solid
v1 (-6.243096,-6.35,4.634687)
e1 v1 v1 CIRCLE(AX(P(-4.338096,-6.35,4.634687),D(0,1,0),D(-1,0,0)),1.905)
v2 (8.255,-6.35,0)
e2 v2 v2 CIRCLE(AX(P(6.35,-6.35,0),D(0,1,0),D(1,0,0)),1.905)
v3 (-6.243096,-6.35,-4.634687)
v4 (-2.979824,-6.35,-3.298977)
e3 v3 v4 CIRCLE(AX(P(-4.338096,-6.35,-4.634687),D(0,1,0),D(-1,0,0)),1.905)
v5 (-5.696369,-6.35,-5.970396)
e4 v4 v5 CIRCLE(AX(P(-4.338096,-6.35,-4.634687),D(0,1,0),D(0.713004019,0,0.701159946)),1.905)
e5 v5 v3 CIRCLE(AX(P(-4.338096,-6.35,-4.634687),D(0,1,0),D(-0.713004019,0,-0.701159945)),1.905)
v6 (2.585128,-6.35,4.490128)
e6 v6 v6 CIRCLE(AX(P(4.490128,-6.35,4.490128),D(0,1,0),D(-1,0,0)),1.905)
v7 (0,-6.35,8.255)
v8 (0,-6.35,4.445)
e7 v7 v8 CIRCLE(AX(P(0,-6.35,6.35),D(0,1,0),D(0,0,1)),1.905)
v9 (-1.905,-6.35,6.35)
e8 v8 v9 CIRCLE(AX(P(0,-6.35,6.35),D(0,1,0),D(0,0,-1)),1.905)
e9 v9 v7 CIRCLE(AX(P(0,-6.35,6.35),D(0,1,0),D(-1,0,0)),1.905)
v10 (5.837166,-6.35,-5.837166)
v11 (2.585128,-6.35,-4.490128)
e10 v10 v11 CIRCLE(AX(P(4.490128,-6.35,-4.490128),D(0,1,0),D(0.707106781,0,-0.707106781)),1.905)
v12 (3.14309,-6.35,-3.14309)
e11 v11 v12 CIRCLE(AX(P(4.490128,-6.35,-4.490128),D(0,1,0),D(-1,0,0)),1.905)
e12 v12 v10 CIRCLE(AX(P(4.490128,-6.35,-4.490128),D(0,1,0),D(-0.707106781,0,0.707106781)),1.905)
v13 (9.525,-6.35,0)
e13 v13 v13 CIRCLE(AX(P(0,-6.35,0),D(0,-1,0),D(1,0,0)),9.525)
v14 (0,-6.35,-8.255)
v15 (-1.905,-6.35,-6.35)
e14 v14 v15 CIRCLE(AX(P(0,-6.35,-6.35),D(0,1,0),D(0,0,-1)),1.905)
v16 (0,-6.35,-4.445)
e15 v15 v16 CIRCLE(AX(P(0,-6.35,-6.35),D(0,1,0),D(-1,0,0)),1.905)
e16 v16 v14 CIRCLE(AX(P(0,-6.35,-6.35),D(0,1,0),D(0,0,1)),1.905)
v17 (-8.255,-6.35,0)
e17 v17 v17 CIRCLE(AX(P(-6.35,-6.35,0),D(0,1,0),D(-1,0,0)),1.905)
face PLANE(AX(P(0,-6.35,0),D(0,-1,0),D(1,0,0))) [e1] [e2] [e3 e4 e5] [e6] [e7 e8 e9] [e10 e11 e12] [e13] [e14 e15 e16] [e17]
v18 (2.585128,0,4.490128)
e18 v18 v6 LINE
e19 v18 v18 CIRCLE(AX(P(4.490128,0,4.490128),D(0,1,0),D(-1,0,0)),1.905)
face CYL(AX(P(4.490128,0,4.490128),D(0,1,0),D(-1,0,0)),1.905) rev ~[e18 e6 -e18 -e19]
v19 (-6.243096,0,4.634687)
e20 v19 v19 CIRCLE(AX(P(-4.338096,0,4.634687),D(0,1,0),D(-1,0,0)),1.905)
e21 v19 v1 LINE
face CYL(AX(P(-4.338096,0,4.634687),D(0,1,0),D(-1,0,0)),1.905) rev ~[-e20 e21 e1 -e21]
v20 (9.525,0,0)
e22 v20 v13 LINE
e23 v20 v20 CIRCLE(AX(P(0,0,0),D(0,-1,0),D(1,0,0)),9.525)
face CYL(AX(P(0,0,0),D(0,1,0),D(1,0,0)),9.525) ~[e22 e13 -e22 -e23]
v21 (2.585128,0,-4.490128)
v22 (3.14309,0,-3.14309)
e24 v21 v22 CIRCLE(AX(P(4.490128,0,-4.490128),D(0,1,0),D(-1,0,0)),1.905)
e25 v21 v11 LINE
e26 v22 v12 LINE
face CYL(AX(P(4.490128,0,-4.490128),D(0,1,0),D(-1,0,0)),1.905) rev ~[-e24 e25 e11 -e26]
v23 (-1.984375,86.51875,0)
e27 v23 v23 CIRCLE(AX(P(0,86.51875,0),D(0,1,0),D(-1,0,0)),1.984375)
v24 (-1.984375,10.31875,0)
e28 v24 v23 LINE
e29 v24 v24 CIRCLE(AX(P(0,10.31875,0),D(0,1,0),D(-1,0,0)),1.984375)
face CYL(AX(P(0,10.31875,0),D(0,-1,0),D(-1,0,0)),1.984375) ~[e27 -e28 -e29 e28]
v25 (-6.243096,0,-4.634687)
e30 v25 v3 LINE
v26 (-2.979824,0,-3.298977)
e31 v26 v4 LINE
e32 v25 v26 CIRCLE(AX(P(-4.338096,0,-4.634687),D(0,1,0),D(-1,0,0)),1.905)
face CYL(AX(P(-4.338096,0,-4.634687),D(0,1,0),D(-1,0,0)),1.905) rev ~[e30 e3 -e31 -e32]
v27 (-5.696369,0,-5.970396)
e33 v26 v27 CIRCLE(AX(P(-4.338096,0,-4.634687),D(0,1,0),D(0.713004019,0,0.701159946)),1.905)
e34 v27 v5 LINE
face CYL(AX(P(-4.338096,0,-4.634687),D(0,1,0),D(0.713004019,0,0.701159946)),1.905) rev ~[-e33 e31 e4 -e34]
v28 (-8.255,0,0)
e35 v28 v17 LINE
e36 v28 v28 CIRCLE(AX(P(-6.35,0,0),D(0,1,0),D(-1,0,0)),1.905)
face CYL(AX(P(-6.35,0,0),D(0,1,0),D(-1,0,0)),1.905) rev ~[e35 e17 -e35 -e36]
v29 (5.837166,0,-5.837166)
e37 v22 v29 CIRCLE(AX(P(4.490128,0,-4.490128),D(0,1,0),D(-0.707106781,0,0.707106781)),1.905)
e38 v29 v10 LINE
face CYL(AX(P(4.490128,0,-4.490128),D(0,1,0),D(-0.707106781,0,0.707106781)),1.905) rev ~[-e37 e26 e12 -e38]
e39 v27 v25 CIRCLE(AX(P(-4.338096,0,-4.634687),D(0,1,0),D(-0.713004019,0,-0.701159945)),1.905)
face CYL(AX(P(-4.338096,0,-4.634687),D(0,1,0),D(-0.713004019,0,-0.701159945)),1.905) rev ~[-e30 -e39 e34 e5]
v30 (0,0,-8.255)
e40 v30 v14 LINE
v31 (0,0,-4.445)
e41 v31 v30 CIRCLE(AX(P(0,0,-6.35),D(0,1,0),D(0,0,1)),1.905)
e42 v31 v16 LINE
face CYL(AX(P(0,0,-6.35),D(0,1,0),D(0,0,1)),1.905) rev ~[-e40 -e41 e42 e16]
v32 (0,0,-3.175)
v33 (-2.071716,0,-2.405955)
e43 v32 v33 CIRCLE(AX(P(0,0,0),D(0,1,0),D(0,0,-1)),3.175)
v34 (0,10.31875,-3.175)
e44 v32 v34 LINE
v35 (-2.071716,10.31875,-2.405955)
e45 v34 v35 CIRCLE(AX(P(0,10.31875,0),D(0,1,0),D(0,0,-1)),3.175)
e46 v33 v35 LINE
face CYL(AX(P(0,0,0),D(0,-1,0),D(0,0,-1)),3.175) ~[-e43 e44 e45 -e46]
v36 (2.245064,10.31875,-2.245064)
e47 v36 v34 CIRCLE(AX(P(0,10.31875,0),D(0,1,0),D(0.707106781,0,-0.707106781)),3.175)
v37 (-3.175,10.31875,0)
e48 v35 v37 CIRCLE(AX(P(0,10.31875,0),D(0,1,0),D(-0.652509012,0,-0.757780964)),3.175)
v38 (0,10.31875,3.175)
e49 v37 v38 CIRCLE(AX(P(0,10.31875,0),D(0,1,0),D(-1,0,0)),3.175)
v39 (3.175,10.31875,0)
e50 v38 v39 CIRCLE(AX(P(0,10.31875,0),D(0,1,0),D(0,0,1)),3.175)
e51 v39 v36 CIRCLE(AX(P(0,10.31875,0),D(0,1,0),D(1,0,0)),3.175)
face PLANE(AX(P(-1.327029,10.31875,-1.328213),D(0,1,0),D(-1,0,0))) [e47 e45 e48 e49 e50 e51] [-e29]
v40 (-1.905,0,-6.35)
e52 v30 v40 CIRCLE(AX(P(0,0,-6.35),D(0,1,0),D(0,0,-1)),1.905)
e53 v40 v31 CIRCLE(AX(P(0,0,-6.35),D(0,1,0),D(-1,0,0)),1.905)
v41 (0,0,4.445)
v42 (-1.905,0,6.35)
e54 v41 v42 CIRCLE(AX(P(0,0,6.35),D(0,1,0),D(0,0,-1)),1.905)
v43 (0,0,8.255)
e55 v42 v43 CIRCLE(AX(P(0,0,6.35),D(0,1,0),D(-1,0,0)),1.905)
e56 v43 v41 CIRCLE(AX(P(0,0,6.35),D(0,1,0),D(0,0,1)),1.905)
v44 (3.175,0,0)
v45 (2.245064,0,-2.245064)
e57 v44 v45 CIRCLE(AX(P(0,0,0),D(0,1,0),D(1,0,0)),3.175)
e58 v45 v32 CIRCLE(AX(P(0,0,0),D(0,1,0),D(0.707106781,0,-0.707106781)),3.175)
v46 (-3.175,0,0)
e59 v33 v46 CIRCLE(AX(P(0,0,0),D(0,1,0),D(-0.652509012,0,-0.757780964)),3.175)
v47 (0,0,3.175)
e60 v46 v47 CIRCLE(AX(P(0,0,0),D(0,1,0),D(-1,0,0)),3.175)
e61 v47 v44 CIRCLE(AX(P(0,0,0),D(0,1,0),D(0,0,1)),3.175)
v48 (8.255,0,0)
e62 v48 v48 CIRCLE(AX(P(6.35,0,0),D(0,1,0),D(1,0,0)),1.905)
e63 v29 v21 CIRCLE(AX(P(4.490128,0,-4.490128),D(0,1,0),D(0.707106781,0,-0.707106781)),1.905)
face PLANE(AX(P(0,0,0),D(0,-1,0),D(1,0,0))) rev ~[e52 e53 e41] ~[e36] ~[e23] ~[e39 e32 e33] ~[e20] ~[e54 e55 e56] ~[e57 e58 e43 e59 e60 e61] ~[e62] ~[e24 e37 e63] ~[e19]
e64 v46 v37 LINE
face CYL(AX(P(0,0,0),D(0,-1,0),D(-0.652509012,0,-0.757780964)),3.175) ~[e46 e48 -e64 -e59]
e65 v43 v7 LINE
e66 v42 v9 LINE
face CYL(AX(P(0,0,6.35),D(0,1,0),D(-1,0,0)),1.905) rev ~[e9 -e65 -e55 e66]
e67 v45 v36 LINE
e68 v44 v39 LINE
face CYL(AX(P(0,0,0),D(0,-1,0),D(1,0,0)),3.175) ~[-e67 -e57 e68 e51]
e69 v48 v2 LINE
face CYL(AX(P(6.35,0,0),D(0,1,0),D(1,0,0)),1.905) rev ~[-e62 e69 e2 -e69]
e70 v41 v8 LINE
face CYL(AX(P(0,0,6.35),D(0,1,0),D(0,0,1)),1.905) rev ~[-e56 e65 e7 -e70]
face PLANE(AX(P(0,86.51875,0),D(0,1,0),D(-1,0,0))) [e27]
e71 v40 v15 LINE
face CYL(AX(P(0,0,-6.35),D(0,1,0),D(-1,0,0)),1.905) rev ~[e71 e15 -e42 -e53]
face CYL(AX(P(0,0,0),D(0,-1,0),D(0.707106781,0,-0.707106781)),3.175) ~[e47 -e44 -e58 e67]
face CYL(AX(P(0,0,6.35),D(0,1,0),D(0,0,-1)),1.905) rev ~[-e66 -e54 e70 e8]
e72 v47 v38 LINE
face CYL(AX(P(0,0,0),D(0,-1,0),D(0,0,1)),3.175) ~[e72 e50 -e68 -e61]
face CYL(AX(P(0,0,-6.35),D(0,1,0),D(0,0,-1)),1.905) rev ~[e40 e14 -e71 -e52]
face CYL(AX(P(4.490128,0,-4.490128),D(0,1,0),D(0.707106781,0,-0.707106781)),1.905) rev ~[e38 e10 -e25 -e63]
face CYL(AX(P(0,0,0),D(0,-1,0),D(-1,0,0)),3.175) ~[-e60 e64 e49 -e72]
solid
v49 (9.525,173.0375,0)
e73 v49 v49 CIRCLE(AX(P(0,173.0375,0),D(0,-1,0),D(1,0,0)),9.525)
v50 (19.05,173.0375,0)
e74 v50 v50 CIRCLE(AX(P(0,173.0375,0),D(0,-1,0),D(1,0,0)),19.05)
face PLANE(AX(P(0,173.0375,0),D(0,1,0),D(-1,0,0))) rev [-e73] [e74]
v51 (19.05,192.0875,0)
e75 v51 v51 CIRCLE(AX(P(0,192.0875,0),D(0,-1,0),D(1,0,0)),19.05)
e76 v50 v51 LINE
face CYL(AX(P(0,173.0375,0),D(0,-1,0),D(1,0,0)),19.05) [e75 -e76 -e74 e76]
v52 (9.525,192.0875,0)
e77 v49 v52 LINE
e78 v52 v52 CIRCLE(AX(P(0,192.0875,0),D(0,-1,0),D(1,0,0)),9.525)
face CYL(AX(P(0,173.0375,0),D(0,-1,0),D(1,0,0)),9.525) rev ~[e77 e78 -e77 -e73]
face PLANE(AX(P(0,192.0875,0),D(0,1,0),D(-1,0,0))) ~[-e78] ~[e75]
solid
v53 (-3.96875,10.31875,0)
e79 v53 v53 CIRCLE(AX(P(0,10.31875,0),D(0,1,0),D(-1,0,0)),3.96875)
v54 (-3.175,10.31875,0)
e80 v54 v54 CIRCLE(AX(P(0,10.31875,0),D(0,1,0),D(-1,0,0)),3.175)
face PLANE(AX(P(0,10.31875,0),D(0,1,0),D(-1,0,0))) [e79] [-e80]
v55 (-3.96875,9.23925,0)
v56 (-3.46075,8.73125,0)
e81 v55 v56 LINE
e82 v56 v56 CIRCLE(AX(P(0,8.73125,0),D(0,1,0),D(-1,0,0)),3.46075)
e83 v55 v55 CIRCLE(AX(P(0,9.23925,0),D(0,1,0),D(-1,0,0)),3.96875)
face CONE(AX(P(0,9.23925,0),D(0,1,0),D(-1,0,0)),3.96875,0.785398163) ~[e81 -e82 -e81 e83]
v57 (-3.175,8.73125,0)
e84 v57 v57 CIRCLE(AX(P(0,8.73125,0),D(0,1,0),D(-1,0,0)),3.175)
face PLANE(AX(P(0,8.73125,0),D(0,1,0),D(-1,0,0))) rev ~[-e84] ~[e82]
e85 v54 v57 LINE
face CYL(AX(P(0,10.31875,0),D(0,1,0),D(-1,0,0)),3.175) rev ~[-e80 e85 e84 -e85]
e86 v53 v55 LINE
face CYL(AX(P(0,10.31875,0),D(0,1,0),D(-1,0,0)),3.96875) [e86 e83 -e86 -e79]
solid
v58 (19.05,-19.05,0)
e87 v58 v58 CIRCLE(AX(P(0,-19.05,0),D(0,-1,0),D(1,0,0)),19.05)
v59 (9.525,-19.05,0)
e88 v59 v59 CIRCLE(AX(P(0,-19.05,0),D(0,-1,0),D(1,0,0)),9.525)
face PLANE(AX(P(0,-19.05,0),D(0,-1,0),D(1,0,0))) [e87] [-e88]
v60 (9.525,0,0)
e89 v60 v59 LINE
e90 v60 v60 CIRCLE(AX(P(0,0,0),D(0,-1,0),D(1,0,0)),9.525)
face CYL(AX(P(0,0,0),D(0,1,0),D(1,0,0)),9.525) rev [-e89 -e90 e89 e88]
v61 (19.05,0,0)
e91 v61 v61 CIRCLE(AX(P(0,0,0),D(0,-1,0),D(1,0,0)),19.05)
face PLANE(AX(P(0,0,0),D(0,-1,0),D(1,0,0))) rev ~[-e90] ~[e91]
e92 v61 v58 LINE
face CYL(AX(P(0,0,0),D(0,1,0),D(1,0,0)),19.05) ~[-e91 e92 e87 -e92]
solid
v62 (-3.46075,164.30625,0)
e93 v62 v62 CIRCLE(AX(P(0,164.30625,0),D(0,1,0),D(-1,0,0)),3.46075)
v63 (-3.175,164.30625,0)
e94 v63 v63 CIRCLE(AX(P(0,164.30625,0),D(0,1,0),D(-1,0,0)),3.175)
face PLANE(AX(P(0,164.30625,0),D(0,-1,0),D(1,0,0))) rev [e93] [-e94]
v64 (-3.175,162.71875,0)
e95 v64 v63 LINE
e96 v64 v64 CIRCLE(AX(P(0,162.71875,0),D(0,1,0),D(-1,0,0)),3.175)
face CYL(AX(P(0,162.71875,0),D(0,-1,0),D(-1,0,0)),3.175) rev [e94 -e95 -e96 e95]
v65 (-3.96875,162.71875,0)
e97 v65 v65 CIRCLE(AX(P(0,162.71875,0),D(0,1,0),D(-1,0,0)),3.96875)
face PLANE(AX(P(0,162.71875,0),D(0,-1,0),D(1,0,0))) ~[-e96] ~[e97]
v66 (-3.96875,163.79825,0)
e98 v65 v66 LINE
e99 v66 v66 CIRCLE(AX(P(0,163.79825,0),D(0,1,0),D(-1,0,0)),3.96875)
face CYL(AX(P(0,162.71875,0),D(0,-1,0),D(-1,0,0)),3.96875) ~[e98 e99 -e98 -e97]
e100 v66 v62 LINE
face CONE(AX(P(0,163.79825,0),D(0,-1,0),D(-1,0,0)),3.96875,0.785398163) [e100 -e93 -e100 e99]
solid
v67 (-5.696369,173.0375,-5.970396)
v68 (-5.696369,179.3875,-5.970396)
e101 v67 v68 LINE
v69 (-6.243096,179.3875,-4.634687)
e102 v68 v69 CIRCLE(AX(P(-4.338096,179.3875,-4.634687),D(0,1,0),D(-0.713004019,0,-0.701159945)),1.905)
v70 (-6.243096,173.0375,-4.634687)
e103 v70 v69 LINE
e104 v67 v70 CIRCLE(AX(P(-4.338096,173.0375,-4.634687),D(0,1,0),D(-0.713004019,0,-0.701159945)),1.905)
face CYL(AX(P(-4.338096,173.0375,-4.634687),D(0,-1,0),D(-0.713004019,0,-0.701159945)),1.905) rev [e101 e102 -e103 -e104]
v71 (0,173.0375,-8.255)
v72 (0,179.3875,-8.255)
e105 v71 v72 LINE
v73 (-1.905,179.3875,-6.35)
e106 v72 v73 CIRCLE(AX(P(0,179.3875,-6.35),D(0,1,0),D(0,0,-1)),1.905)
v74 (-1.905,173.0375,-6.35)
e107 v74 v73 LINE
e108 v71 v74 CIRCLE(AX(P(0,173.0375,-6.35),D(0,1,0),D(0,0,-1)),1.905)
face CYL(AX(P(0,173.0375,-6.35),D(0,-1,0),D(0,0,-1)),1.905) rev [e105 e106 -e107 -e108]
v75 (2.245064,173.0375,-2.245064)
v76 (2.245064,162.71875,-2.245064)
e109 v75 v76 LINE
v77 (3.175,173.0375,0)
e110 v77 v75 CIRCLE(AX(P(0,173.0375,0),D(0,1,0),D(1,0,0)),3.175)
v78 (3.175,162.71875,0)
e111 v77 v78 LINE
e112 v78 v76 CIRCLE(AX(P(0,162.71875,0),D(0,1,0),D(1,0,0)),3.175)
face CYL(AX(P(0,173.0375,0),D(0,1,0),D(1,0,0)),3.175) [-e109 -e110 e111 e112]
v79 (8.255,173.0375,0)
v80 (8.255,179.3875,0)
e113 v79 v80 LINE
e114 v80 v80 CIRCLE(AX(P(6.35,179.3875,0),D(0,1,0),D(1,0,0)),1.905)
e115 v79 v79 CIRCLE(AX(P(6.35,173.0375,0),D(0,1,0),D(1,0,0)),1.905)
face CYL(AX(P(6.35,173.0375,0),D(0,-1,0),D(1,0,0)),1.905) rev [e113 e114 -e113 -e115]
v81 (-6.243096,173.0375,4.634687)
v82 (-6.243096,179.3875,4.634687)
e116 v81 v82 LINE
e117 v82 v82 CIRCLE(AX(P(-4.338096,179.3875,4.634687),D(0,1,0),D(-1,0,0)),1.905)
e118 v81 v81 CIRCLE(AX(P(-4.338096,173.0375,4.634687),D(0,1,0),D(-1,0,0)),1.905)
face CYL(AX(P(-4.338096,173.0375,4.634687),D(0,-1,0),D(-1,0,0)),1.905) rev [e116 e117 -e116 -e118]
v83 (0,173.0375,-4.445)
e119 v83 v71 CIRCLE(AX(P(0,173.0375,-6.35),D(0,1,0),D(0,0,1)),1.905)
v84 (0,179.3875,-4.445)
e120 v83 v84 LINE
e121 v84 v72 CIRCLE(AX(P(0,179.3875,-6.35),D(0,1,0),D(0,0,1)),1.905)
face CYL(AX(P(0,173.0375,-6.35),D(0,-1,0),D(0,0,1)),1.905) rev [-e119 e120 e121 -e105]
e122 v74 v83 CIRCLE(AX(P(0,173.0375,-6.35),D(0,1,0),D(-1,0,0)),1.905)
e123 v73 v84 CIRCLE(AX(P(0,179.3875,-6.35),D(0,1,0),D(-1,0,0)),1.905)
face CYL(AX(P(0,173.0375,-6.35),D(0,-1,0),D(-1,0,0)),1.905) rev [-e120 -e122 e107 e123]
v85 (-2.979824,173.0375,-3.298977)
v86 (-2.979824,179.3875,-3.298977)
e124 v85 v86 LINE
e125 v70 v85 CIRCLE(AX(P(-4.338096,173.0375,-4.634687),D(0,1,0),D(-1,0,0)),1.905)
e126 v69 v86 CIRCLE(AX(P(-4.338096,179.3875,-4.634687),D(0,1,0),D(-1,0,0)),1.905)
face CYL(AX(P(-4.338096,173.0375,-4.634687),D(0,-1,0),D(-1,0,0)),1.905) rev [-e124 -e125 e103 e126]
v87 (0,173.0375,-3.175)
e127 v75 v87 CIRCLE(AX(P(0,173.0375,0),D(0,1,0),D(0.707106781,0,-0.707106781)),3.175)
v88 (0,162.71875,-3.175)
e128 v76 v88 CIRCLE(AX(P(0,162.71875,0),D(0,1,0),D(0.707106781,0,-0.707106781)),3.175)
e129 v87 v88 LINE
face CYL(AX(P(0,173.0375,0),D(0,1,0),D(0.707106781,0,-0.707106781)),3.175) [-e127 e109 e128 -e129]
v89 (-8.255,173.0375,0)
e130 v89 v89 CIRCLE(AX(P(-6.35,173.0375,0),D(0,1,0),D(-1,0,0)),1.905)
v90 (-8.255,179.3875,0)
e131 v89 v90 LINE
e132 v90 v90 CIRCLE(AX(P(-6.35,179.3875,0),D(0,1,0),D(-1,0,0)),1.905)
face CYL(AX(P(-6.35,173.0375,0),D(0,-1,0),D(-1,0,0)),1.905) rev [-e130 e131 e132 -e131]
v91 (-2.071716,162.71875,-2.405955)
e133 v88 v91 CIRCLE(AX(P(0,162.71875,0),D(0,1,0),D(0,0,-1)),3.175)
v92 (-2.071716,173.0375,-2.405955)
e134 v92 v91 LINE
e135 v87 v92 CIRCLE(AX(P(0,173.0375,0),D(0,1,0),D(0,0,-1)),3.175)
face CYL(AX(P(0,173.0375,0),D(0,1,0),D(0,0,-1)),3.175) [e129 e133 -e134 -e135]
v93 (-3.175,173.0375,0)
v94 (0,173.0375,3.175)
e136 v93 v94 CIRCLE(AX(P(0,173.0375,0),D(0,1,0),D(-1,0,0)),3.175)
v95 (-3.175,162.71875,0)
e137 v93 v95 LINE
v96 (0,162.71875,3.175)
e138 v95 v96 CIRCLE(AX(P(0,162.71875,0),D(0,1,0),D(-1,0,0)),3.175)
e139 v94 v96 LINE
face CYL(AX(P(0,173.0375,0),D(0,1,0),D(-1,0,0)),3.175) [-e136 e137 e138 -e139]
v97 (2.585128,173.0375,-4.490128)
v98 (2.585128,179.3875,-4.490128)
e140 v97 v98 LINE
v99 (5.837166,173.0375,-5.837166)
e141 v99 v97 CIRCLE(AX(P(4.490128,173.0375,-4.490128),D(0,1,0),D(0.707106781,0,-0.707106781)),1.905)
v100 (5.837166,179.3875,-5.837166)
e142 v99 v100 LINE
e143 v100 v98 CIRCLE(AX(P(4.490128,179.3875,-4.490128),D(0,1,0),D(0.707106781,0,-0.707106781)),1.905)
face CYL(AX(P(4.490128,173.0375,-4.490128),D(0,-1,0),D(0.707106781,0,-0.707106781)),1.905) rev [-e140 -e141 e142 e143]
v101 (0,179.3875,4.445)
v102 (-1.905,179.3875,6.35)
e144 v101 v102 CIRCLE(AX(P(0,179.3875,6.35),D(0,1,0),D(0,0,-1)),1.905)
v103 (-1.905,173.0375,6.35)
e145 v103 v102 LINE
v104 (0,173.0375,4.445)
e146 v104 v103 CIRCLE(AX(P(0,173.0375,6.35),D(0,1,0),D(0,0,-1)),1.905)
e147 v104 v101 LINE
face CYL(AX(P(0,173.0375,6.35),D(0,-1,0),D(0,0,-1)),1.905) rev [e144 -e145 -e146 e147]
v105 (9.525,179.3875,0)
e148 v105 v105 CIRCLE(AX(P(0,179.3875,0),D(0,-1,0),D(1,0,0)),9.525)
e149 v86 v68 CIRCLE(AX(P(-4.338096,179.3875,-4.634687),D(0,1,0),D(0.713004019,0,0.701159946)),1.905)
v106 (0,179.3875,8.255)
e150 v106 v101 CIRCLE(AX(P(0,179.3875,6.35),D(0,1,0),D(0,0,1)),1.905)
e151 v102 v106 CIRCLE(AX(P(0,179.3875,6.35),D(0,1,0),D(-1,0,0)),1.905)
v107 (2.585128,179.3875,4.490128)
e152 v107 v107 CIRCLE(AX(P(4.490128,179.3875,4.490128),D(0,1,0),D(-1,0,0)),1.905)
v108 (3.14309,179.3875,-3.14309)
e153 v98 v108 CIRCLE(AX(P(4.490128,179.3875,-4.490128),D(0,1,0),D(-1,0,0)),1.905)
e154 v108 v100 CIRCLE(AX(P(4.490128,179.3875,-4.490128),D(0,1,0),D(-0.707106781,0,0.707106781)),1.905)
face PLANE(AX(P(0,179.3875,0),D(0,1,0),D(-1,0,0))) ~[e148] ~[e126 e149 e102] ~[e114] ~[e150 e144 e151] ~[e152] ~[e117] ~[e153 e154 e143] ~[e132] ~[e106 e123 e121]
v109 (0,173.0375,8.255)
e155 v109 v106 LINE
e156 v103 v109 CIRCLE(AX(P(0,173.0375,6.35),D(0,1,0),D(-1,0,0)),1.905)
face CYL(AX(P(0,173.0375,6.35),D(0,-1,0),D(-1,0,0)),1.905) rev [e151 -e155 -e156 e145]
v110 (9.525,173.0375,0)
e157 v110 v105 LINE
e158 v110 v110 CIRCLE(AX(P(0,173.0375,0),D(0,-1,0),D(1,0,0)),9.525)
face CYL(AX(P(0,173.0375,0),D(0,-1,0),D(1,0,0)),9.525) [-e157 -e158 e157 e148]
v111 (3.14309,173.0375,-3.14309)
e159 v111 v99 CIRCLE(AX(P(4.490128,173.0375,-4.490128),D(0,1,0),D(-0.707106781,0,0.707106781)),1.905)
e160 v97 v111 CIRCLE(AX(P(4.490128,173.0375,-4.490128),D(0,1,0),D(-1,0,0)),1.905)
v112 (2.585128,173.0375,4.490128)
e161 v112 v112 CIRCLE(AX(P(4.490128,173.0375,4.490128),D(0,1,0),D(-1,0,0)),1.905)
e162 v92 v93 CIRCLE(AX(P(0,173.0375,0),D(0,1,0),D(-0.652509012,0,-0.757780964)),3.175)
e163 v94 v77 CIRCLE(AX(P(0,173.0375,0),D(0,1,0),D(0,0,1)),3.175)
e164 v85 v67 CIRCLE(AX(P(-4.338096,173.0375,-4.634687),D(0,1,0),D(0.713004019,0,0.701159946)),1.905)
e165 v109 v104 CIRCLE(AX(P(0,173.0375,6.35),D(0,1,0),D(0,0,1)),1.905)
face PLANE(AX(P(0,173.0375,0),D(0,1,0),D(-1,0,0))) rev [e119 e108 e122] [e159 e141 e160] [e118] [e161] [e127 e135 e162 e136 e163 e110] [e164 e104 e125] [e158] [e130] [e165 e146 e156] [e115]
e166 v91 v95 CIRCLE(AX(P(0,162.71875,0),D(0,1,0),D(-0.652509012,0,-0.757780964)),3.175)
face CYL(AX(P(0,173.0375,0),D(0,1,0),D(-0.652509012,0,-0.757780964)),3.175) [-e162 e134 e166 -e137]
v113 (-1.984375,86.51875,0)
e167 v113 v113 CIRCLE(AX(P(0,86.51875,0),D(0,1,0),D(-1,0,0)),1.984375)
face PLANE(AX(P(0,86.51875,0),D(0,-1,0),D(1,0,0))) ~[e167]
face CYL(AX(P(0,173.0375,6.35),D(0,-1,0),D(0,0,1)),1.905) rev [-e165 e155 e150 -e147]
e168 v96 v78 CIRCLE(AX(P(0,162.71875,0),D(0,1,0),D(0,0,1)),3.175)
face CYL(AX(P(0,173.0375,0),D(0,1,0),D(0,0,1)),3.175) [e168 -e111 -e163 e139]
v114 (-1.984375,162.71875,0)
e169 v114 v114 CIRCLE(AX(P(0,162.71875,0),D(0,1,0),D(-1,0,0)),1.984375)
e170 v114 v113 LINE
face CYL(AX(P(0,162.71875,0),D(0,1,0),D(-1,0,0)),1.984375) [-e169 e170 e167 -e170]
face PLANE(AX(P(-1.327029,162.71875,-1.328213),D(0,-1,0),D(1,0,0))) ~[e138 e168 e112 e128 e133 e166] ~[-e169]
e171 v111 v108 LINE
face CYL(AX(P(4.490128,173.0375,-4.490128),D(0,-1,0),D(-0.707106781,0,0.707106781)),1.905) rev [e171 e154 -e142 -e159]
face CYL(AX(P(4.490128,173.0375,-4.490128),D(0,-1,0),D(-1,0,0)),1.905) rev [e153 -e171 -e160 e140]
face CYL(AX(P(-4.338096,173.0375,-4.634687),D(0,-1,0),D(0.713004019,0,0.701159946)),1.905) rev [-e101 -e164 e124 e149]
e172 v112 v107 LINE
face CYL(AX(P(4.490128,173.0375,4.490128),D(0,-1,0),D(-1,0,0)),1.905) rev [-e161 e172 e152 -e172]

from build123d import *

# Parameters (mm, degrees)
F0_R     = 19.05
F0_R_2   = 9.525
F1_DEPTH = 19.05
F2_DEPTH = 6.35
F4_DEPTH = 10.31875
F3_R     = 1.905
F5_DEPTH = 6.35
F6_R     = 3.96875
F6_R_2   = 3.175
F7_DEPTH = 1.5875
F8_SIZE  = 0.508
F6_R_3   = 1.984375
F9_DEPTH = 76.2


with BuildPart() as f1:
    # F0 (on Front) → F1 (new body)
    with BuildSketch(Plane.XZ):
        Circle(F0_R)
        Circle(F0_R_2, mode=Mode.SUBTRACT)
    extrude(amount=F1_DEPTH)


with BuildPart() as f2:
    # F0 (on Front) → F2 (new body)
    with BuildSketch(Plane.XZ):
        Circle(F0_R_2)
    extrude(amount=F2_DEPTH)

    # F3 (on face) → F4 (join)
    with BuildSketch(Plane(origin=(0, 0, 0), x_dir=(-1, 0, 0), z_dir=(0, 1, 0))):
        with BuildLine():
            Line((3.175, 0), (0, 0))
            Line((0, 0), (0, -3.175))
            ThreePointArc((0, -3.175), (1.1049251721, -2.9765357992), (2.0717161135, -2.4059545601))
            ThreePointArc((2.0717161135, -2.4059545601), (2.88602873, -1.3234285662), (3.175, 0))
        make_face()
        with BuildLine():
            ThreePointArc((3.175, 0), (2.2450640303, 2.2450640303), (0, 3.175))
            Line((0, 3.175), (0, 0))
            Line((0, 0), (3.175, 0))
        make_face()
        with BuildLine():
            ThreePointArc((0, 3.175), (-2.2450640303, 2.2450640303), (-3.175, 0))
            Line((-3.175, 0), (0, 0))
            Line((0, 0), (0, 3.175))
        make_face()
        with BuildLine():
            Line((0, 0), (-2.2450640303, -2.2450640303))
            ThreePointArc((-2.2450640303, -2.2450640303), (-1.2150198978, -2.9333175157), (0, -3.175))
            Line((0, -3.175), (0, 0))
        make_face()
        with BuildLine():
            Line((0, 0), (-3.175, 0))
            ThreePointArc((-3.175, 0), (-2.9333175157, -1.2150198978), (-2.2450640303, -2.2450640303))
            Line((-2.2450640303, -2.2450640303), (0, 0))
        make_face()
    extrude(amount=F4_DEPTH)

    # F3 (on face) → F5 (cut)
    with BuildSketch(Plane(origin=(0, 0, 0), x_dir=(-1, 0, 0), z_dir=(0, 1, 0))):
        with Locations((4.3380962214, 4.6346866725)):
            Circle(F3_R)
        with BuildLine():
            Line((8.255, 0), (4.445, 0))
            ThreePointArc((4.445, 0), (6.35, -1.905), (8.255, 0))
        make_face()
        with BuildLine():
            ThreePointArc((8.255, 0), (6.35, 1.905), (4.445, 0))
            Line((4.445, 0), (8.255, 0))
        make_face()
        with BuildLine():
            ThreePointArc((6.2430962214, -4.6346866725), (5.0597317217, -2.8716588211), (2.9798235656, -3.2989769763))
            Line((2.9798235656, -3.2989769763), (5.6963688772, -5.9703963686))
            ThreePointArc((5.6963688772, -5.9703963686), (6.1011240727, -5.3563221728), (6.2430962214, -4.6346866725))
        make_face()
        with BuildLine():
            Line((5.6963688772, -5.9703963686), (2.9798235656, -3.2989769763))
            ThreePointArc((2.9798235656, -3.2989769763), (3.0023865252, -5.9929593283), (5.6963688772, -5.9703963686))
        make_face()
        with BuildLine():
            Line((0, -8.255), (0, -4.445))
            ThreePointArc((0, -4.445), (-1.905, -6.35), (0, -8.255))
        make_face()
        with BuildLine():
            ThreePointArc((1.905, -6.35), (1.3470384182, -5.0029615818), (0, -4.445))
            Line((0, -4.445), (0, -8.255))
            ThreePointArc((0, -8.255), (1.3470384182, -7.6970384182), (1.905, -6.35))
        make_face()
        with BuildLine():
            Line((-5.8371664787, -5.8371664787), (-3.1430896424, -3.1430896424))
            ThreePointArc((-3.1430896424, -3.1430896424), (-5.8371664787, -3.1430896424), (-5.8371664787, -5.8371664787))
        make_face()
        with BuildLine():
            ThreePointArc((-2.5851280605, -4.4901280605), (-2.7301375511, -3.7611161219), (-3.1430896424, -3.1430896424))
            Line((-3.1430896424, -3.1430896424), (-5.8371664787, -5.8371664787))
            ThreePointArc((-5.8371664787, -5.8371664787), (-3.7611161219, -6.25011857), (-2.5851280605, -4.4901280605))
        make_face()
        with BuildLine():
            Line((-8.255, 0), (-4.445, 0))
            ThreePointArc((-4.445, 0), (-6.35, 1.905), (-8.255, 0))
        make_face()
        with BuildLine():
            ThreePointArc((-8.255, 0), (-6.35, -1.905), (-4.445, 0))
            Line((-4.445, 0), (-8.255, 0))
        make_face()
        with Locations((-4.4901280605, 4.4901280605)):
            Circle(F3_R)
        with BuildLine():
            ThreePointArc((0, 8.255), (-1.905, 6.35), (0, 4.445))
            Line((0, 4.445), (0, 8.255))
        make_face()
        with BuildLine():
            Line((0, 8.255), (0, 4.445))
            ThreePointArc((0, 4.445), (1.3470384182, 5.0029615818), (1.905, 6.35))
            ThreePointArc((1.905, 6.35), (1.3470384182, 7.6970384182), (0, 8.255))
        make_face()
    extrude(amount=-F5_DEPTH, mode=Mode.SUBTRACT)

    # F6 (on face) → F9 (join)
    with BuildSketch(Plane(origin=(0, 10.31875, 0), x_dir=(-1, 0, 0), z_dir=(0, 1, 0))):
        Circle(F6_R_3)
    extrude(amount=F9_DEPTH)


with BuildPart() as f7:
    # F6 (on face) → F7 (new body)
    with BuildSketch(Plane(origin=(0, 10.31875, 0), x_dir=(-1, 0, 0), z_dir=(0, 1, 0))):
        Circle(F6_R)
        Circle(F6_R_2, mode=Mode.SUBTRACT)
    extrude(amount=-F7_DEPTH)

    # F8
    f8_edges = [f7.edges().sort_by_distance(p)[0] for p in [
        (3.96875, 8.73125, 0),
    ]]
    chamfer(f8_edges, length=F8_SIZE)


with BuildPart() as f10_1:
    # F10: instance of F1
    add(f1.part.mirror(Plane(origin=(0, 86.51875, 0), x_dir=(-1, 0, 0), z_dir=(0, 1, 0))))


with BuildPart() as f10_2:
    # F10: instance of F2
    add(f2.part.mirror(Plane(origin=(0, 86.51875, 0), x_dir=(-1, 0, 0), z_dir=(0, 1, 0))))


with BuildPart() as f10_3:
    # F10: instance of F7
    add(f7.part.mirror(Plane(origin=(0, 86.51875, 0), x_dir=(-1, 0, 0), z_dir=(0, 1, 0))))


solid = Compound([f1.part, f2.part, f7.part, f10_1.part, f10_2.part, f10_3.part])
